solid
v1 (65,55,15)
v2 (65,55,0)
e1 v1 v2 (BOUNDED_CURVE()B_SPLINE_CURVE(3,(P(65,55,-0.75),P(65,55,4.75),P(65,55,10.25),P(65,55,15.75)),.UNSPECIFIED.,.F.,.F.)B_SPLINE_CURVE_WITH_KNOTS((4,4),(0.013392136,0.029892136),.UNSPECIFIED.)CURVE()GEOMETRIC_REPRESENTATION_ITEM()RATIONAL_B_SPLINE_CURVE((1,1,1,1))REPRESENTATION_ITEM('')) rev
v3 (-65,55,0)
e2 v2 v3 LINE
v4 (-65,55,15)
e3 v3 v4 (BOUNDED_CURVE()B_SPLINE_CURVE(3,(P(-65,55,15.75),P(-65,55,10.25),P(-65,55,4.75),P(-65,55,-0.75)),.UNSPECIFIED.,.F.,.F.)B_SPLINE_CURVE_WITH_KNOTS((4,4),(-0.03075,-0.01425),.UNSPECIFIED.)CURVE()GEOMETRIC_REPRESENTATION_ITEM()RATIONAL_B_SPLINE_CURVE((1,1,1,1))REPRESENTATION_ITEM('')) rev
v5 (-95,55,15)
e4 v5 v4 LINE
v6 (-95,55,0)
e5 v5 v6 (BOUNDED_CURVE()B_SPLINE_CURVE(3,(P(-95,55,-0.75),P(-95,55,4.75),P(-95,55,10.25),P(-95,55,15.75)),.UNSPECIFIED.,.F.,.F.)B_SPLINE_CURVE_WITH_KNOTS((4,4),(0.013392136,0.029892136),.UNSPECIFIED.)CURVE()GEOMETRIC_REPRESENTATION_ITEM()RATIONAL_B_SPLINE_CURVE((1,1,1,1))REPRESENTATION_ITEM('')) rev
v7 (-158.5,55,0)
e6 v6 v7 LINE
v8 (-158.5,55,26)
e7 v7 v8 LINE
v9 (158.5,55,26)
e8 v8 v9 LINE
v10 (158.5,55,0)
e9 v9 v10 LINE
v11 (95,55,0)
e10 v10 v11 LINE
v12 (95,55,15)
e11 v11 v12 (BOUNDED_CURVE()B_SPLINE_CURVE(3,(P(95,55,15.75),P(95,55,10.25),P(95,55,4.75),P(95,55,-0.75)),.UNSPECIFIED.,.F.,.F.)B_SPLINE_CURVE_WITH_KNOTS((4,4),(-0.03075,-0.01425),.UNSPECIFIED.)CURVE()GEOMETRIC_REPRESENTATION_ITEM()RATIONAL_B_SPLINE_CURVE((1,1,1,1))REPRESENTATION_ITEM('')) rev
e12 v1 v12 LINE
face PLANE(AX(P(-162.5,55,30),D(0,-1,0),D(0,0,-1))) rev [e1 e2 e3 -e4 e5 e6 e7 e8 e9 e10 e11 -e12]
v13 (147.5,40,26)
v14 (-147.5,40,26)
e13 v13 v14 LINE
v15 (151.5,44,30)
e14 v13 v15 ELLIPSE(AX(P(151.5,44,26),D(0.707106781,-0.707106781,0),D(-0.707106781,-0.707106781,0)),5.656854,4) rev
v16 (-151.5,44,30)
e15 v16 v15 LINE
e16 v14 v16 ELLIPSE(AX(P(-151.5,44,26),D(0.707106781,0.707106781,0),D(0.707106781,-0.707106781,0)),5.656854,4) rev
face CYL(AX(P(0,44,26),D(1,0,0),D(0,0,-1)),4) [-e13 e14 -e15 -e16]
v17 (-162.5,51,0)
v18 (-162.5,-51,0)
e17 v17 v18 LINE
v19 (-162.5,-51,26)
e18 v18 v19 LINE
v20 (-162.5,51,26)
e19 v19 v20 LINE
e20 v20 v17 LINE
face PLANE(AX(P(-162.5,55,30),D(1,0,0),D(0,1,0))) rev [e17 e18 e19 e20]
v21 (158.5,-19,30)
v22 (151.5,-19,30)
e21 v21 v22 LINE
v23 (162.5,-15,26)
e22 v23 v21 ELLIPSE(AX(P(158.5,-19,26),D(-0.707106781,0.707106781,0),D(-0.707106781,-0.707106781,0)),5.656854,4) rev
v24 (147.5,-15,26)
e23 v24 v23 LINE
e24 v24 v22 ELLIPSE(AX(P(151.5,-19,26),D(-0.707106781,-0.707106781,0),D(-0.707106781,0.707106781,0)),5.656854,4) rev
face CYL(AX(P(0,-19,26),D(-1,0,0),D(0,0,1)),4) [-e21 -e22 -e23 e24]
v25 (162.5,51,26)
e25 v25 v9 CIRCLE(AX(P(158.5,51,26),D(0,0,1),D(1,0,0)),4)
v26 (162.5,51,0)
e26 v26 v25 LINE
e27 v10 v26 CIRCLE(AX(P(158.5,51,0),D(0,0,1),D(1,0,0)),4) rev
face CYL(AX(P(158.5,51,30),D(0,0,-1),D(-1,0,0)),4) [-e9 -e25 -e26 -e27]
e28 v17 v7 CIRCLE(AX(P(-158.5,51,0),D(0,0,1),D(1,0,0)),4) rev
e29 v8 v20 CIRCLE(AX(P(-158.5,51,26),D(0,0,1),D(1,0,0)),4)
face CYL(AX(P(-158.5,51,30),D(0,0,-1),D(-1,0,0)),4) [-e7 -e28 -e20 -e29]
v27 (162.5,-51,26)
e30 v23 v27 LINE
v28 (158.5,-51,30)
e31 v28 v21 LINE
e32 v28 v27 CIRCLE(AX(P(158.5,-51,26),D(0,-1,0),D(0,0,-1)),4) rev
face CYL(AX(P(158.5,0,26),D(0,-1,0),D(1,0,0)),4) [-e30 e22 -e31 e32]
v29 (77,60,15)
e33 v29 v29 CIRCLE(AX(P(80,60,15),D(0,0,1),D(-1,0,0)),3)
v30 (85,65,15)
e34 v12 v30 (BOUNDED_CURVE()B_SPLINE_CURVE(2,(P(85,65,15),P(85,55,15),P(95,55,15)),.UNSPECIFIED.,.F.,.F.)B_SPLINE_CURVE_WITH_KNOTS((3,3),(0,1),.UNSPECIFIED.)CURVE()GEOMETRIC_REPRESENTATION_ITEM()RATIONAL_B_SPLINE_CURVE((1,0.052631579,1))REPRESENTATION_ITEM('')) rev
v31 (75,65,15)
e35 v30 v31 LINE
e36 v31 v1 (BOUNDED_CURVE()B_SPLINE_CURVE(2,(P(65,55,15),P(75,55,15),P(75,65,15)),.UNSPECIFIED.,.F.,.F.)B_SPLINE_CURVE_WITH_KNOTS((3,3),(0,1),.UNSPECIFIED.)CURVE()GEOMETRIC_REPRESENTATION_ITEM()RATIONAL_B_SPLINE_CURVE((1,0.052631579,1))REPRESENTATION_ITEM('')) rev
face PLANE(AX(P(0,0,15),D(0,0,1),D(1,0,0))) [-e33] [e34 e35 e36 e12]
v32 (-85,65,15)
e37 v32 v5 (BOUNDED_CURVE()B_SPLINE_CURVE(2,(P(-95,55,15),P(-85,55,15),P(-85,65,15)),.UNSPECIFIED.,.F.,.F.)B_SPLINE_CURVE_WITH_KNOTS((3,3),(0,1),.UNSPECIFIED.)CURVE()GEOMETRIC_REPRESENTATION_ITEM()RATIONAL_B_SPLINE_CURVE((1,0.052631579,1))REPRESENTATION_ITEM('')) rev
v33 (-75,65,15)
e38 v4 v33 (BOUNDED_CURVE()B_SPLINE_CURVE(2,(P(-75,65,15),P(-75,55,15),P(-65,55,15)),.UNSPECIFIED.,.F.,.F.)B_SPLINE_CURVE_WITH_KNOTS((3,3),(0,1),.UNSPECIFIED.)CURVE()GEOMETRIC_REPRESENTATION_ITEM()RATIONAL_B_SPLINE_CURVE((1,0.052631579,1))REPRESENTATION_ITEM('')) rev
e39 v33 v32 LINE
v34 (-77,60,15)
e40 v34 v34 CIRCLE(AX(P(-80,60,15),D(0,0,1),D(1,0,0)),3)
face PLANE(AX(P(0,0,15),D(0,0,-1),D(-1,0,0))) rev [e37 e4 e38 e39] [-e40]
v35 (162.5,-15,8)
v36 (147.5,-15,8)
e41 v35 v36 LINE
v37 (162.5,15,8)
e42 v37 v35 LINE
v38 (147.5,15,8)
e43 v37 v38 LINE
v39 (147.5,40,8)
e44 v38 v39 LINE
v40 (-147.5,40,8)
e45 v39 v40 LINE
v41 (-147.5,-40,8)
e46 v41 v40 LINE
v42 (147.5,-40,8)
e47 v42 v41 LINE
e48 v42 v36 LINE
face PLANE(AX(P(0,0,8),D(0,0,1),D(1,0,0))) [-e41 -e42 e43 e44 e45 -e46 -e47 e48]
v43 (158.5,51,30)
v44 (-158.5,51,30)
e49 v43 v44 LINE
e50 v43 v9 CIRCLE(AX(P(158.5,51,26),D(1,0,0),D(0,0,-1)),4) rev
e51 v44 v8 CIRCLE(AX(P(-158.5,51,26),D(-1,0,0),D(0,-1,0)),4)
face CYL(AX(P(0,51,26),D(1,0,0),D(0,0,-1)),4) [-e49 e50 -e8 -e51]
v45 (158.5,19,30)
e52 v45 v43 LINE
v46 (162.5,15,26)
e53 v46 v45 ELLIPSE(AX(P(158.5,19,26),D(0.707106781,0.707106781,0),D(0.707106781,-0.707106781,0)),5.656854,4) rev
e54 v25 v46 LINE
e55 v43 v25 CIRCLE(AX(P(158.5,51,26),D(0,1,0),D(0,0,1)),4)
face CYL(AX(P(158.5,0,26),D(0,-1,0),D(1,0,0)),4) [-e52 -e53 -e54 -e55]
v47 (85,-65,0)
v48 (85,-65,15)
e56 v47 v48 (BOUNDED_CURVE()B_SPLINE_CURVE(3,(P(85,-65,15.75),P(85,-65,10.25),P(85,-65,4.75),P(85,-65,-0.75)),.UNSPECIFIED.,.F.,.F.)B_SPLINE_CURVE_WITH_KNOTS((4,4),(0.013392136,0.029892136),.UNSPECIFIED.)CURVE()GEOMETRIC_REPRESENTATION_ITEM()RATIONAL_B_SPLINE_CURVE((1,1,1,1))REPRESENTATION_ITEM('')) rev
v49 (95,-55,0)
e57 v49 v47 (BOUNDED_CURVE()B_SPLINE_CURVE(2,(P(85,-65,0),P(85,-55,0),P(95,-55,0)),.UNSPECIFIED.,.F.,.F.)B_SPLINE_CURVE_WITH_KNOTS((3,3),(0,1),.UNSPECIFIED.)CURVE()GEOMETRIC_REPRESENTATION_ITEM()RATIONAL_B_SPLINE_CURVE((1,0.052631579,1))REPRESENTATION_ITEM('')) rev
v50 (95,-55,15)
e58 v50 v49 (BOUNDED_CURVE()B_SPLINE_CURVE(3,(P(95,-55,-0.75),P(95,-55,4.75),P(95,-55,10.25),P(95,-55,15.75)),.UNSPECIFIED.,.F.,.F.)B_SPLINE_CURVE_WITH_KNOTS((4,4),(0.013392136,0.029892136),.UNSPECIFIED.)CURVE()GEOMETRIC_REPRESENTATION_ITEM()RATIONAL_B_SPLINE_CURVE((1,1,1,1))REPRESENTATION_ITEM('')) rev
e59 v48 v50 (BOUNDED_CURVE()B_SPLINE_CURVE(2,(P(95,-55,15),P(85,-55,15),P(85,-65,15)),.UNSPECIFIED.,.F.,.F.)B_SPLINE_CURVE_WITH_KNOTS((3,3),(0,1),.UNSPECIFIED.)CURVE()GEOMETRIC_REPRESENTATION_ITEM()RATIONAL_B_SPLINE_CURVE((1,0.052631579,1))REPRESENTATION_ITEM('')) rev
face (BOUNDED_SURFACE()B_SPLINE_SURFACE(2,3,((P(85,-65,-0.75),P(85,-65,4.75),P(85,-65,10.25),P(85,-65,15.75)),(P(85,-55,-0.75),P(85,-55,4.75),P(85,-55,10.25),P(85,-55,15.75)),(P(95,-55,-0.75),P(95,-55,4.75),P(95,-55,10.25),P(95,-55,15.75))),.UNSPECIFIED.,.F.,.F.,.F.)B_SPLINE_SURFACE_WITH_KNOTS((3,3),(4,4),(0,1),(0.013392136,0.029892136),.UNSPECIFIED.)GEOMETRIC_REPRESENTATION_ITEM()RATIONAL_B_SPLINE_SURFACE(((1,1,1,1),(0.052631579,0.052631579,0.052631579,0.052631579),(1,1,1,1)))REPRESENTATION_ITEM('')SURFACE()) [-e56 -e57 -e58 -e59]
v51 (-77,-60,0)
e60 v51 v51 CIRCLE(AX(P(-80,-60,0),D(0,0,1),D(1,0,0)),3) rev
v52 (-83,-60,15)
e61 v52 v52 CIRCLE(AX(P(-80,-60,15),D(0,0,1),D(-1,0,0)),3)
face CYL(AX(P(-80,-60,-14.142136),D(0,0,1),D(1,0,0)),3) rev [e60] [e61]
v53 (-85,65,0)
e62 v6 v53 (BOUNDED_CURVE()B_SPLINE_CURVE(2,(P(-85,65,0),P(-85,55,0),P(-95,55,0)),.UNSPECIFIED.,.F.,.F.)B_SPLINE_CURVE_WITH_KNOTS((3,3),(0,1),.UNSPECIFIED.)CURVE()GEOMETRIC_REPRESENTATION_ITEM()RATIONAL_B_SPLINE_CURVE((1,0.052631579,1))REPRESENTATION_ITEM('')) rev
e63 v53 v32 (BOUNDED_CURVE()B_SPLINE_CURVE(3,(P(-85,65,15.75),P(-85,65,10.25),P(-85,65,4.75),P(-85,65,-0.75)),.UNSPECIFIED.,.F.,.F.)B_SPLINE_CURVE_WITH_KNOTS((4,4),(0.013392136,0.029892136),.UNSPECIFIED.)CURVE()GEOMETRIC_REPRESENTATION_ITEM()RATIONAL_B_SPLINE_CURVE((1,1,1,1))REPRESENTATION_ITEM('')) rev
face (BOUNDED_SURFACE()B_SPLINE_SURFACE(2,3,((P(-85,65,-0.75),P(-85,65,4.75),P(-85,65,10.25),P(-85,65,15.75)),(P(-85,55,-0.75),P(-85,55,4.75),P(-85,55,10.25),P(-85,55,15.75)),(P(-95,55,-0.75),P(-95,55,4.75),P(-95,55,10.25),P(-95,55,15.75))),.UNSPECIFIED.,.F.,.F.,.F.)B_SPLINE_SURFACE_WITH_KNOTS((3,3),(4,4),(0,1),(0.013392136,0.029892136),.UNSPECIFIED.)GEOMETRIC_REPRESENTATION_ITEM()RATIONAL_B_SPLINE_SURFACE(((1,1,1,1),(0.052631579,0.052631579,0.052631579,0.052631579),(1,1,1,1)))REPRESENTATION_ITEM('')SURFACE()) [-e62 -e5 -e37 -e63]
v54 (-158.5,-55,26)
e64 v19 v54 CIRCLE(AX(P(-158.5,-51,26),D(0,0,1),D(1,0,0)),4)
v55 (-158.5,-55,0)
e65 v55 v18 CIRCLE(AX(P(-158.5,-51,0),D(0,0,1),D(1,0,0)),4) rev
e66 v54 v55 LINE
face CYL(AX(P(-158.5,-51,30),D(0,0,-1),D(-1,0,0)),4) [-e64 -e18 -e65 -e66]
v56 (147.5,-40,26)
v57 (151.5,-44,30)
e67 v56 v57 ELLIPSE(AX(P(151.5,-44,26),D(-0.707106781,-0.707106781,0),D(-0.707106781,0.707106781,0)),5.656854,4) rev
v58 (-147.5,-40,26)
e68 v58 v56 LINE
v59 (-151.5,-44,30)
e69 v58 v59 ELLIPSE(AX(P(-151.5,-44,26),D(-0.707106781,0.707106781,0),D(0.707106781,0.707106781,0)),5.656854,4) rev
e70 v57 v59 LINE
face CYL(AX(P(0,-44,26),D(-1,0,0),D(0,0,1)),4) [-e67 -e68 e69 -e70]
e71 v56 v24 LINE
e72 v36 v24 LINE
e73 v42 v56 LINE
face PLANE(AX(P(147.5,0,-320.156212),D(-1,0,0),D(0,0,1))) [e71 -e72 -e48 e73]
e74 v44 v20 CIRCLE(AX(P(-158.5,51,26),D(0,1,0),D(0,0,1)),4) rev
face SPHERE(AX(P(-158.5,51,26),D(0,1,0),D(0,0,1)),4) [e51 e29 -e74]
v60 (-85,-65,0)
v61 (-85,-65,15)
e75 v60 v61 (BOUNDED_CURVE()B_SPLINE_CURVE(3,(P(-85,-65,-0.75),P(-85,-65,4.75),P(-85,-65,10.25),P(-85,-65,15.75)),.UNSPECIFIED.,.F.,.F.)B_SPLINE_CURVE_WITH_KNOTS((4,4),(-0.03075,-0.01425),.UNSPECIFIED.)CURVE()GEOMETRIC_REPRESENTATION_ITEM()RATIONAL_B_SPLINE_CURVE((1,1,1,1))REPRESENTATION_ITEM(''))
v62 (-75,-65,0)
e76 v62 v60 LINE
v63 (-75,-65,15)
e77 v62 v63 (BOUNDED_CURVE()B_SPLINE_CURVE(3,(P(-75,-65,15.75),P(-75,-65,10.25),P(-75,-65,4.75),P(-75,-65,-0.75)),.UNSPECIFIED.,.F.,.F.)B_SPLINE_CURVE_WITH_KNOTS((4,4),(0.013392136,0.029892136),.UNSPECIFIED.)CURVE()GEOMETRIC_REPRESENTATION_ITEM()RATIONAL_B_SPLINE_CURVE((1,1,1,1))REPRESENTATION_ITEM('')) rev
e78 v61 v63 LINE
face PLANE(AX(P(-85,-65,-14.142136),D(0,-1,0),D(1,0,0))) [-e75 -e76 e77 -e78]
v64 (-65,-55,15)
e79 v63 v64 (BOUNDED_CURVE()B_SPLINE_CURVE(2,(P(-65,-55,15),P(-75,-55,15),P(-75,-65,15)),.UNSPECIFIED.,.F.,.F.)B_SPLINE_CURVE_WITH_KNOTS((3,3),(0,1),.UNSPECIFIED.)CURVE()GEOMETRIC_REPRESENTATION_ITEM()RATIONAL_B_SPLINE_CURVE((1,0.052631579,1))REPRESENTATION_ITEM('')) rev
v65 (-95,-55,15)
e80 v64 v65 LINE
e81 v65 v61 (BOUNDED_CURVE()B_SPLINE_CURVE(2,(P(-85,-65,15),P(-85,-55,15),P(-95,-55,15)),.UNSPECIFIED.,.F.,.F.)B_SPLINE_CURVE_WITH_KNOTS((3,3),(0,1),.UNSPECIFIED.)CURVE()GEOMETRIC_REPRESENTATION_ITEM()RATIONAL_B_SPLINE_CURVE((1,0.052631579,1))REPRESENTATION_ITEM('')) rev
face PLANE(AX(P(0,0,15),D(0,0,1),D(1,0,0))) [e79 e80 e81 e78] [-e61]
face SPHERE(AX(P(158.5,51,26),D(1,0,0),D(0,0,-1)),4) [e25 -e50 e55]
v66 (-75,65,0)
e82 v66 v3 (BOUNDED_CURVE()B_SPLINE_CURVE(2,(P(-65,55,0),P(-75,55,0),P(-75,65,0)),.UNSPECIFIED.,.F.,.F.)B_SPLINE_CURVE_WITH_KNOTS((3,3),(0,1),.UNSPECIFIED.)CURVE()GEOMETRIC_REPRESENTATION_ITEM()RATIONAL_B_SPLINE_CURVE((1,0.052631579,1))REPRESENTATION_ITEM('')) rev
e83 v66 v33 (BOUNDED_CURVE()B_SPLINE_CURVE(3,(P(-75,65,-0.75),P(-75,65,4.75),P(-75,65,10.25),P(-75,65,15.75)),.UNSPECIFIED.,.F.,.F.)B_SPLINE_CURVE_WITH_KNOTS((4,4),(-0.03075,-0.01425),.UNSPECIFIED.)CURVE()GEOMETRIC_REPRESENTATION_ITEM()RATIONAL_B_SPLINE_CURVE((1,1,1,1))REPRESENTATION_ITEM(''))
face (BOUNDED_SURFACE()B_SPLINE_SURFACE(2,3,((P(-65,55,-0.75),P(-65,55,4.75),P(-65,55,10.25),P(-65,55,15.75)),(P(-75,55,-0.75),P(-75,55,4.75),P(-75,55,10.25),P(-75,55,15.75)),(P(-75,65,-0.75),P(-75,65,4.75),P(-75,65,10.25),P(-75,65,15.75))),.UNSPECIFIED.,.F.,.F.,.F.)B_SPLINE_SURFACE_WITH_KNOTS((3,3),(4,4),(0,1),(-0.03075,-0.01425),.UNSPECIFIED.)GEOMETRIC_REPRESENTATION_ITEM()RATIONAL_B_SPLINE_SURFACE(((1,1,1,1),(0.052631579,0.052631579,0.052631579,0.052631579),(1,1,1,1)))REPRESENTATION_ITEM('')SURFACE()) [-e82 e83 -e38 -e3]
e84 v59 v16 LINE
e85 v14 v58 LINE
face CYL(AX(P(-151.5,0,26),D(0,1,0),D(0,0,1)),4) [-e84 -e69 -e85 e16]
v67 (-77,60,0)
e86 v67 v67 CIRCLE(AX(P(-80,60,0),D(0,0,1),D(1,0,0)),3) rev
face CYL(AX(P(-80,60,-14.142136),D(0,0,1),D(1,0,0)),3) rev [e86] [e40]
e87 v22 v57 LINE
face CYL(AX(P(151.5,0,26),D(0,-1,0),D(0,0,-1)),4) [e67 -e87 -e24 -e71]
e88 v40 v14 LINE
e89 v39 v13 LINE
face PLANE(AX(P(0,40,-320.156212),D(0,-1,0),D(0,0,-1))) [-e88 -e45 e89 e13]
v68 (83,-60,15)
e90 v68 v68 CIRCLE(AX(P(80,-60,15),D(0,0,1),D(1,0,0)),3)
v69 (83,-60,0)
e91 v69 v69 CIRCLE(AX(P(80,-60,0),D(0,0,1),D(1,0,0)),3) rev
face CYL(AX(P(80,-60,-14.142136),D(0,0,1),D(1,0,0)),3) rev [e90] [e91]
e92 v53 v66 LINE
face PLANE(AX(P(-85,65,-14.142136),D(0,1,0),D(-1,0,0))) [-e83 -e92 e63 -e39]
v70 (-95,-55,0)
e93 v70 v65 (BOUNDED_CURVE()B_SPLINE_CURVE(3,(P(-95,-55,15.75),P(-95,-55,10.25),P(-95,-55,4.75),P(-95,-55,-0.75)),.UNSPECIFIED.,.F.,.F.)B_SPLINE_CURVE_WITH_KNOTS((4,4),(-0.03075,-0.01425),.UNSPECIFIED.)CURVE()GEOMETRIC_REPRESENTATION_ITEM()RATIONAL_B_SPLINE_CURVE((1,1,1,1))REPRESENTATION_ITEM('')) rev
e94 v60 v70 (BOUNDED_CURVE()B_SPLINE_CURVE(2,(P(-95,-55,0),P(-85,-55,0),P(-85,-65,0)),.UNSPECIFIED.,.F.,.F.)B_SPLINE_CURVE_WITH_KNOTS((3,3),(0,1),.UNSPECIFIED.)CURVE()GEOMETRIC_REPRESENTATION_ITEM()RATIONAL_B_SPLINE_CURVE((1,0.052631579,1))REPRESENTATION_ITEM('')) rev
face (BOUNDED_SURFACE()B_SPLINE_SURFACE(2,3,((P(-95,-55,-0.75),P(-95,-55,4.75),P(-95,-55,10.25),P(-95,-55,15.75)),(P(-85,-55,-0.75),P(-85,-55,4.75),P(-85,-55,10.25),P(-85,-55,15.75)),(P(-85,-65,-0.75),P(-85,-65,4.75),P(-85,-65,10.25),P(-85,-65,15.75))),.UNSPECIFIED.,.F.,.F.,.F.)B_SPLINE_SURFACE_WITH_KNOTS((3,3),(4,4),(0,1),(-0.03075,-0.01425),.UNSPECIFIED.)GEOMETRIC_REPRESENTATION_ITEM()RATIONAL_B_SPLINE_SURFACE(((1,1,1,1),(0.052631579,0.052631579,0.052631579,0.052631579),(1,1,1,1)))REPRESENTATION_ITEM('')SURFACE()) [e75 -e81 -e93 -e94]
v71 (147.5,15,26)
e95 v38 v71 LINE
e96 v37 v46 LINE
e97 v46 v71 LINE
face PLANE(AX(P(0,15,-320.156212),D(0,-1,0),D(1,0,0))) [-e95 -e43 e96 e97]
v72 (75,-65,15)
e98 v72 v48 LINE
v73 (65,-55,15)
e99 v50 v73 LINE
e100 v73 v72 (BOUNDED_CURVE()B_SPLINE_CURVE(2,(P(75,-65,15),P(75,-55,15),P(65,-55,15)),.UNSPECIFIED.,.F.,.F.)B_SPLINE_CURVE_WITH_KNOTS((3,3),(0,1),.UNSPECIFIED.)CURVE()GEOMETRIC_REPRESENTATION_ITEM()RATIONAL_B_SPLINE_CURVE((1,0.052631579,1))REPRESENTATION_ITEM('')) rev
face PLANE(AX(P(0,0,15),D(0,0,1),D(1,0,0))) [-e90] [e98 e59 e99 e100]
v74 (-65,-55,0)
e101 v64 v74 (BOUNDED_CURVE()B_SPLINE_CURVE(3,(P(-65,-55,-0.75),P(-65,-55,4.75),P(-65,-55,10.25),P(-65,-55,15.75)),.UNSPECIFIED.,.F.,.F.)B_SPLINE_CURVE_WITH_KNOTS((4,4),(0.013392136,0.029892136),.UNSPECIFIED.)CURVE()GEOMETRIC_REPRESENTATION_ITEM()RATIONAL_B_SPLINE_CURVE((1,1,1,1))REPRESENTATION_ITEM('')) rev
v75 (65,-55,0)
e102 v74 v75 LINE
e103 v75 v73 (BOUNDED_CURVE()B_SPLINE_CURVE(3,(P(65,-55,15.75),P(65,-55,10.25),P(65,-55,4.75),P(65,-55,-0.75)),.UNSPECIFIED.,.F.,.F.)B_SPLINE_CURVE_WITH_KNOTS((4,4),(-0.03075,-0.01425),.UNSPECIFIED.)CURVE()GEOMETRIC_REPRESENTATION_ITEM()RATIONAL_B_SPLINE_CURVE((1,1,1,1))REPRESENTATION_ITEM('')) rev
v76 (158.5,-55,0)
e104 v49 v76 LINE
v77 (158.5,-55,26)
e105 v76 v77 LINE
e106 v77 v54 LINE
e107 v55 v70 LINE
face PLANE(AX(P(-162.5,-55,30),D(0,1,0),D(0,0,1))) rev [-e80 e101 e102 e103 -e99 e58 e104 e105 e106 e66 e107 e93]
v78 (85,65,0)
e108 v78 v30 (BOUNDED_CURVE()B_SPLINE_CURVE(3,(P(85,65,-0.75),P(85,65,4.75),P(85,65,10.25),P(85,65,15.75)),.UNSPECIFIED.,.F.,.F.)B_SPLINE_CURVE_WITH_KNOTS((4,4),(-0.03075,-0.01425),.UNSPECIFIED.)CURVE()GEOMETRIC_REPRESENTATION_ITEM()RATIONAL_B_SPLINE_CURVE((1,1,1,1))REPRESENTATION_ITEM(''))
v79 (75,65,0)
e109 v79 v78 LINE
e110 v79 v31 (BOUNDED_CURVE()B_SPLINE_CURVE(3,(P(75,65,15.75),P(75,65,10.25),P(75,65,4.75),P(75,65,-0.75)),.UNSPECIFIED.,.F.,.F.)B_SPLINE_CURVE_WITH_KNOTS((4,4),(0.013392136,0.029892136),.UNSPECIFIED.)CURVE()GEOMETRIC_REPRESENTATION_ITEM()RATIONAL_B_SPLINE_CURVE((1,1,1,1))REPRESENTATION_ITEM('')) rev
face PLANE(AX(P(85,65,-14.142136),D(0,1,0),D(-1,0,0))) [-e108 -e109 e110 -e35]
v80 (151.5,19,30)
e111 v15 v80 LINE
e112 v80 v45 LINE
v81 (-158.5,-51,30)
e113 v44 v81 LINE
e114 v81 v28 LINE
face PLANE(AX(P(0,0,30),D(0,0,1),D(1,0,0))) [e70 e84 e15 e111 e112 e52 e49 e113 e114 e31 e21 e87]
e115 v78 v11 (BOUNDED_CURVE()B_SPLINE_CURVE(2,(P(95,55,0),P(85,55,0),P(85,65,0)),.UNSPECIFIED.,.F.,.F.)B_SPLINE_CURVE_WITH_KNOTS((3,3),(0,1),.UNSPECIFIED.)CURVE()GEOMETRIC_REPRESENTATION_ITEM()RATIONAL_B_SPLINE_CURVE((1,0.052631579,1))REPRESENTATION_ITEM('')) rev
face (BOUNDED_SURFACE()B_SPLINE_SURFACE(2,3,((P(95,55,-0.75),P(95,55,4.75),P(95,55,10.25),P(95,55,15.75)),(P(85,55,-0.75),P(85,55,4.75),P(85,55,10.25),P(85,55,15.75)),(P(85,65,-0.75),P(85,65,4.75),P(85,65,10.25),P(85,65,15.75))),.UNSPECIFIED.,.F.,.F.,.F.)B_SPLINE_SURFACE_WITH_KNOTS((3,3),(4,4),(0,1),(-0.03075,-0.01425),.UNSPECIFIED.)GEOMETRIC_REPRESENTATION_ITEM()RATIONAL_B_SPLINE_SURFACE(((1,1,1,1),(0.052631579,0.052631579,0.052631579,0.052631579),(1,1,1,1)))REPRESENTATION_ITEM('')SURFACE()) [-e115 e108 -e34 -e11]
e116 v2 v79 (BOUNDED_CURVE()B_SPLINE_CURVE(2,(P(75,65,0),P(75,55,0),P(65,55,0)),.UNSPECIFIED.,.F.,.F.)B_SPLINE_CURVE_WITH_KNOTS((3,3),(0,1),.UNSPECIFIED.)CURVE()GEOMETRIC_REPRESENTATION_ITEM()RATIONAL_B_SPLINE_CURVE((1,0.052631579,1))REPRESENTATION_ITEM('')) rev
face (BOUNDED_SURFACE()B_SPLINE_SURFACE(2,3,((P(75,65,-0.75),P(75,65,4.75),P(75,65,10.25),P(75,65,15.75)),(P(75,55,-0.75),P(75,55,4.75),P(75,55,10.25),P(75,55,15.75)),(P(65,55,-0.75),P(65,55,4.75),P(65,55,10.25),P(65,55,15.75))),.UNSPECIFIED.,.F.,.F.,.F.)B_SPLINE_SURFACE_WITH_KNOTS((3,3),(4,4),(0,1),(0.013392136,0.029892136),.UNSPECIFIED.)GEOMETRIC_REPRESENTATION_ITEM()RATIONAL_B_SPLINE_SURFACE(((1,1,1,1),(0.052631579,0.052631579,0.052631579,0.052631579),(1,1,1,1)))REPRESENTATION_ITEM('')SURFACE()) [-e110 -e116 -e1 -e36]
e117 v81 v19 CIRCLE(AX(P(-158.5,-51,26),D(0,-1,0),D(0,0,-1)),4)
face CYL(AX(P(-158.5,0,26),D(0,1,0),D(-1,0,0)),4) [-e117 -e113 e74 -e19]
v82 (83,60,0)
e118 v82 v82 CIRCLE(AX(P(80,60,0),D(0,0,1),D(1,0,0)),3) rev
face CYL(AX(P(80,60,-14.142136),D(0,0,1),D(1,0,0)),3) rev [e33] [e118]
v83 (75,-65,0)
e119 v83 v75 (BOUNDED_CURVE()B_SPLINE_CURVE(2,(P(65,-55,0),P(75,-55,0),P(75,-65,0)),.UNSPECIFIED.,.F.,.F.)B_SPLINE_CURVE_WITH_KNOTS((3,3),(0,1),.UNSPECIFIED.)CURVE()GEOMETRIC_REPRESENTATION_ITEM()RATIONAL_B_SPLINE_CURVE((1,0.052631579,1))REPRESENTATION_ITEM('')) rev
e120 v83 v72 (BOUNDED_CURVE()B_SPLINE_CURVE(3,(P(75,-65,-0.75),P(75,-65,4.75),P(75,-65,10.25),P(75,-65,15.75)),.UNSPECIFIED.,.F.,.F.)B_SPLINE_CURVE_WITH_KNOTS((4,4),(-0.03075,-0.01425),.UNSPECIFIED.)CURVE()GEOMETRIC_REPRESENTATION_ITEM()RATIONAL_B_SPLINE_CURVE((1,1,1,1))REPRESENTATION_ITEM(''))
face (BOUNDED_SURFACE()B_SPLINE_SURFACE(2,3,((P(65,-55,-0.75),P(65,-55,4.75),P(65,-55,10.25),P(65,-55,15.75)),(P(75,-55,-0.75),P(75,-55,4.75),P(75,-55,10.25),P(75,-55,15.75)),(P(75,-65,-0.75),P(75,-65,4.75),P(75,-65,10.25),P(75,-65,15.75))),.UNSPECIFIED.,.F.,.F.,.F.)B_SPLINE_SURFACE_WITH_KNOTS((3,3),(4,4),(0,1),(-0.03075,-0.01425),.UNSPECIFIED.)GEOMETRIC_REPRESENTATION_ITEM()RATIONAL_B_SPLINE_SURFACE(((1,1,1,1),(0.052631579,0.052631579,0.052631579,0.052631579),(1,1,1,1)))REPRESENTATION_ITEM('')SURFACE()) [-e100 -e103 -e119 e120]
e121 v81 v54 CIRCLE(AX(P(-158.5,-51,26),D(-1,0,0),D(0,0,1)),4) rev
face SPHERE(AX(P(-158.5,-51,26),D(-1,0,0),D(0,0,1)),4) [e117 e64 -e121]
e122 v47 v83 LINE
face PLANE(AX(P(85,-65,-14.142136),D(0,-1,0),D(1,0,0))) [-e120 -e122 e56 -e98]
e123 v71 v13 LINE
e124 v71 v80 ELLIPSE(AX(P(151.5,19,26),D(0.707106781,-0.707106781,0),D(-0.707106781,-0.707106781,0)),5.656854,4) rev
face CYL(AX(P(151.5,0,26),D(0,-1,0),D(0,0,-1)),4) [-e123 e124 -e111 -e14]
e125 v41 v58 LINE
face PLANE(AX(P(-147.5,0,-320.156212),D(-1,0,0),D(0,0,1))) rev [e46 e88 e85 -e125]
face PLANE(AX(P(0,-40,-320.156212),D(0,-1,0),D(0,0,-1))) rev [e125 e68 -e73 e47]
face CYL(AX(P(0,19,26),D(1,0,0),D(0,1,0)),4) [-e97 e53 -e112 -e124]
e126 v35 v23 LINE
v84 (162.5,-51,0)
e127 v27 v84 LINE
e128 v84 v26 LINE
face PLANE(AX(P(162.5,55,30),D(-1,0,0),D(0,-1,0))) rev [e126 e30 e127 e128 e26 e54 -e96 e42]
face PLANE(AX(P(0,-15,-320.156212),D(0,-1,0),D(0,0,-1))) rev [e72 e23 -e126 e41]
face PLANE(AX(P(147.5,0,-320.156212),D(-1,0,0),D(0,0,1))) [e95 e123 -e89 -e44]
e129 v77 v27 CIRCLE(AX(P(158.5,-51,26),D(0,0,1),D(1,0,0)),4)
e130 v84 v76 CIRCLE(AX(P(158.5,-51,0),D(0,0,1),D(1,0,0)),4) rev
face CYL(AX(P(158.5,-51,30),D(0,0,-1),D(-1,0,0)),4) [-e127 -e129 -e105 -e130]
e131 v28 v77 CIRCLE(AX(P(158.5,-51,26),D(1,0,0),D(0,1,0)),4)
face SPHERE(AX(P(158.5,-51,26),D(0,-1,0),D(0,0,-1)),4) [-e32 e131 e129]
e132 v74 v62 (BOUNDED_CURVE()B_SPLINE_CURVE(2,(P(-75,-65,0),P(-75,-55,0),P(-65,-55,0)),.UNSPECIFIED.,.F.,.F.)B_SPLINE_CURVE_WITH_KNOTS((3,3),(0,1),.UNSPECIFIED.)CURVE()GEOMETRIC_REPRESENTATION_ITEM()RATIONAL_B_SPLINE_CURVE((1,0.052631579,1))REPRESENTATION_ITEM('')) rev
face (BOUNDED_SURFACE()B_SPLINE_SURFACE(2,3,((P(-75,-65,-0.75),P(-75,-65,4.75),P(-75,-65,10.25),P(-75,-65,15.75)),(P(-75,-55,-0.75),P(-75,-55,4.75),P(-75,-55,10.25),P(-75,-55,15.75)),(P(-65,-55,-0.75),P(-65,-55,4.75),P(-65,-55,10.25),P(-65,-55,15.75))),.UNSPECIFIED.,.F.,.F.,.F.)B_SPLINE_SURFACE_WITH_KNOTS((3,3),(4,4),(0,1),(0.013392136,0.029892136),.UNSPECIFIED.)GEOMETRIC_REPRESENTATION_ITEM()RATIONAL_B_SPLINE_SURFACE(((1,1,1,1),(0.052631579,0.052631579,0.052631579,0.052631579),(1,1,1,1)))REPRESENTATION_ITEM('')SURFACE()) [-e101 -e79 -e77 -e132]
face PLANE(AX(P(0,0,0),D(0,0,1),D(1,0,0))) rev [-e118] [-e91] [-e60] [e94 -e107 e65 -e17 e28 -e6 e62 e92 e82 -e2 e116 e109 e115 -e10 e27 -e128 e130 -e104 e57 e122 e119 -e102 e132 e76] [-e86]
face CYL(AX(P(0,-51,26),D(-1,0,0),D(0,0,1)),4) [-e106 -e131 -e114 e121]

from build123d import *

# Parameters (mm, degrees)
SCHIZZO1_W                   = 325
SCHIZZO1_H                   = 110
ESTRUSIONE_ESTRUSIONE1_DEPTH = 30
SCHIZZO2_W                   = 15
SCHIZZO2_H                   = 30
SCHIZZO2_W_2                 = 295
SCHIZZO2_H_2                 = 80
TAGLIO_ESTRUSIONE1_DEPTH     = 22
ESTRUSIONE_ESTRUSIONE2_START = -15
SCHIZZO3_W                   = 10
SCHIZZO3_H                   = 10
SCHIZZO3_R                   = 3
ESTRUSIONE_ESTRUSIONE2_DEPTH = 15
RACCORDO1_DEPTH              = 15
RACCORDO2_R                  = 4


with BuildPart() as part:
    # Schizzo1 → Estrusione-Estrusione1 (new body)
    with BuildSketch(Plane.XY):
        Rectangle(SCHIZZO1_W, SCHIZZO1_H)
    extrude(amount=ESTRUSIONE_ESTRUSIONE1_DEPTH)

    # Schizzo2 → Taglio-Estrusione1 (cut)
    with BuildSketch(Plane.XY.offset(30)):
        with Locations((155, 0)):
            Rectangle(SCHIZZO2_W, SCHIZZO2_H)
        Rectangle(SCHIZZO2_W_2, SCHIZZO2_H_2)
    extrude(amount=-TAGLIO_ESTRUSIONE1_DEPTH, mode=Mode.SUBTRACT)

    # Schizzo3 → Estrusione-Estrusione2 (add)
    # profile 1 of 4: a face of its own
    with BuildSketch(Plane.XY.offset(30).offset(ESTRUSIONE_ESTRUSIONE2_START)):
        with Locations((-80, 60)):
            Rectangle(SCHIZZO3_W, SCHIZZO3_H)
        with Locations((-80, 60)):
            Circle(SCHIZZO3_R, mode=Mode.SUBTRACT)
    # profile 2 of 4: a face of its own
    with BuildSketch(Plane.XY.offset(30).offset(ESTRUSIONE_ESTRUSIONE2_START)):
        with Locations((80, 60)):
            Rectangle(SCHIZZO3_W, SCHIZZO3_H)
        with Locations((80, 60)):
            Circle(SCHIZZO3_R, mode=Mode.SUBTRACT)
    # profile 3 of 4: a face of its own
    with BuildSketch(Plane.XY.offset(30).offset(ESTRUSIONE_ESTRUSIONE2_START)):
        with Locations((80, -60)):
            Rectangle(SCHIZZO3_W, SCHIZZO3_H)
        with Locations((80, -60)):
            Circle(SCHIZZO3_R, mode=Mode.SUBTRACT)
    # profile 4 of 4: a face of its own
    with BuildSketch(Plane.XY.offset(30).offset(ESTRUSIONE_ESTRUSIONE2_START)):
        with Locations((-80, -60)):
            Rectangle(SCHIZZO3_W, SCHIZZO3_H)
        with Locations((-80, -60)):
            Circle(SCHIZZO3_R, mode=Mode.SUBTRACT)
    extrude(amount=-ESTRUSIONE_ESTRUSIONE2_DEPTH)

    # Raccordo1: read off the stored shape, not the designer's step
    # Raccordo1 outline → Raccordo1 (add)
    with BuildSketch(Plane.XY):
        with BuildLine():
            Line((85, 55), (95, 55))
            add(Edge.make_bspline(
                [(95, 55), (85, 55), (85, 65)],
                knots=[0, 0, 0, 1, 1, 1], degree=2, weights=[1, 0.052631579, 1]))
            Line((85, 65), (85, 55))
        make_face()
        with BuildLine():
            Line((-95, 55), (-85, 55))
            Line((-85, 55), (-85, 65))
            add(Edge.make_bspline(
                [(-85, 65), (-85, 55), (-95, 55)],
                knots=[0, 0, 0, 1, 1, 1], degree=2, weights=[1, 0.052631579, 1]))
        make_face()
        with BuildLine():
            Line((-75, 55), (-65, 55))
            add(Edge.make_bspline(
                [(-65, 55), (-75, 55), (-75, 65)],
                knots=[0, 0, 0, 1, 1, 1], degree=2, weights=[1, 0.052631579, 1]))
            Line((-75, 65), (-75, 55))
        make_face()
        with BuildLine():
            Line((65, 55), (75, 55))
            Line((75, 55), (75, 65))
            add(Edge.make_bspline(
                [(75, 65), (75, 55), (65, 55)],
                knots=[0, 0, 0, 1, 1, 1], degree=2, weights=[1, 0.052631579, 1]))
        make_face()
        with BuildLine():
            Line((75, -55), (65, -55))
            add(Edge.make_bspline(
                [(65, -55), (75, -55), (75, -65)],
                knots=[0, 0, 0, 1, 1, 1], degree=2, weights=[1, 0.052631579, 1]))
            Line((75, -65), (75, -55))
        make_face()
        with BuildLine():
            Line((95, -55), (85, -55))
            Line((85, -55), (85, -65))
            add(Edge.make_bspline(
                [(85, -65), (85, -55), (95, -55)],
                knots=[0, 0, 0, 1, 1, 1], degree=2, weights=[1, 0.052631579, 1]))
        make_face()
        with BuildLine():
            Line((-85, -65), (-85, -55))
            Line((-85, -55), (-95, -55))
            add(Edge.make_bspline(
                [(-95, -55), (-85, -55), (-85, -65)],
                knots=[0, 0, 0, 1, 1, 1], degree=2, weights=[1, 0.052631579, 1]))
        make_face()
        with BuildLine():
            add(Edge.make_bspline(
                [(-75, -65), (-75, -55), (-65, -55)],
                knots=[0, 0, 0, 1, 1, 1], degree=2, weights=[1, 0.052631579, 1]))
            Line((-65, -55), (-75, -55))
            Line((-75, -55), (-75, -65))
        make_face()
    extrude(amount=RACCORDO1_DEPTH)

    # Raccordo2
    raccordo2_edges = [part.edges().sort_by_distance(p)[0] for p in [
        (0, 40, 30),
        (-147.5, 0, 30),
        (0, -40, 30),
        (147.5, -27.5, 30),
        (155, -15, 30),
        (162.5, -35, 30),
        (0, -55, 30),
        (-162.5, 0, 30),
        (0, 55, 30),
        (162.5, 35, 30),
        (155, 15, 30),
        (147.5, 27.5, 30),
        (-162.5, 55, 15),
        (-162.5, -55, 15),
        (162.5, -55, 15),
        (162.5, 55, 15),
    ]]
    fillet(raccordo2_edges, radius=RACCORDO2_R)


solid = part.part
